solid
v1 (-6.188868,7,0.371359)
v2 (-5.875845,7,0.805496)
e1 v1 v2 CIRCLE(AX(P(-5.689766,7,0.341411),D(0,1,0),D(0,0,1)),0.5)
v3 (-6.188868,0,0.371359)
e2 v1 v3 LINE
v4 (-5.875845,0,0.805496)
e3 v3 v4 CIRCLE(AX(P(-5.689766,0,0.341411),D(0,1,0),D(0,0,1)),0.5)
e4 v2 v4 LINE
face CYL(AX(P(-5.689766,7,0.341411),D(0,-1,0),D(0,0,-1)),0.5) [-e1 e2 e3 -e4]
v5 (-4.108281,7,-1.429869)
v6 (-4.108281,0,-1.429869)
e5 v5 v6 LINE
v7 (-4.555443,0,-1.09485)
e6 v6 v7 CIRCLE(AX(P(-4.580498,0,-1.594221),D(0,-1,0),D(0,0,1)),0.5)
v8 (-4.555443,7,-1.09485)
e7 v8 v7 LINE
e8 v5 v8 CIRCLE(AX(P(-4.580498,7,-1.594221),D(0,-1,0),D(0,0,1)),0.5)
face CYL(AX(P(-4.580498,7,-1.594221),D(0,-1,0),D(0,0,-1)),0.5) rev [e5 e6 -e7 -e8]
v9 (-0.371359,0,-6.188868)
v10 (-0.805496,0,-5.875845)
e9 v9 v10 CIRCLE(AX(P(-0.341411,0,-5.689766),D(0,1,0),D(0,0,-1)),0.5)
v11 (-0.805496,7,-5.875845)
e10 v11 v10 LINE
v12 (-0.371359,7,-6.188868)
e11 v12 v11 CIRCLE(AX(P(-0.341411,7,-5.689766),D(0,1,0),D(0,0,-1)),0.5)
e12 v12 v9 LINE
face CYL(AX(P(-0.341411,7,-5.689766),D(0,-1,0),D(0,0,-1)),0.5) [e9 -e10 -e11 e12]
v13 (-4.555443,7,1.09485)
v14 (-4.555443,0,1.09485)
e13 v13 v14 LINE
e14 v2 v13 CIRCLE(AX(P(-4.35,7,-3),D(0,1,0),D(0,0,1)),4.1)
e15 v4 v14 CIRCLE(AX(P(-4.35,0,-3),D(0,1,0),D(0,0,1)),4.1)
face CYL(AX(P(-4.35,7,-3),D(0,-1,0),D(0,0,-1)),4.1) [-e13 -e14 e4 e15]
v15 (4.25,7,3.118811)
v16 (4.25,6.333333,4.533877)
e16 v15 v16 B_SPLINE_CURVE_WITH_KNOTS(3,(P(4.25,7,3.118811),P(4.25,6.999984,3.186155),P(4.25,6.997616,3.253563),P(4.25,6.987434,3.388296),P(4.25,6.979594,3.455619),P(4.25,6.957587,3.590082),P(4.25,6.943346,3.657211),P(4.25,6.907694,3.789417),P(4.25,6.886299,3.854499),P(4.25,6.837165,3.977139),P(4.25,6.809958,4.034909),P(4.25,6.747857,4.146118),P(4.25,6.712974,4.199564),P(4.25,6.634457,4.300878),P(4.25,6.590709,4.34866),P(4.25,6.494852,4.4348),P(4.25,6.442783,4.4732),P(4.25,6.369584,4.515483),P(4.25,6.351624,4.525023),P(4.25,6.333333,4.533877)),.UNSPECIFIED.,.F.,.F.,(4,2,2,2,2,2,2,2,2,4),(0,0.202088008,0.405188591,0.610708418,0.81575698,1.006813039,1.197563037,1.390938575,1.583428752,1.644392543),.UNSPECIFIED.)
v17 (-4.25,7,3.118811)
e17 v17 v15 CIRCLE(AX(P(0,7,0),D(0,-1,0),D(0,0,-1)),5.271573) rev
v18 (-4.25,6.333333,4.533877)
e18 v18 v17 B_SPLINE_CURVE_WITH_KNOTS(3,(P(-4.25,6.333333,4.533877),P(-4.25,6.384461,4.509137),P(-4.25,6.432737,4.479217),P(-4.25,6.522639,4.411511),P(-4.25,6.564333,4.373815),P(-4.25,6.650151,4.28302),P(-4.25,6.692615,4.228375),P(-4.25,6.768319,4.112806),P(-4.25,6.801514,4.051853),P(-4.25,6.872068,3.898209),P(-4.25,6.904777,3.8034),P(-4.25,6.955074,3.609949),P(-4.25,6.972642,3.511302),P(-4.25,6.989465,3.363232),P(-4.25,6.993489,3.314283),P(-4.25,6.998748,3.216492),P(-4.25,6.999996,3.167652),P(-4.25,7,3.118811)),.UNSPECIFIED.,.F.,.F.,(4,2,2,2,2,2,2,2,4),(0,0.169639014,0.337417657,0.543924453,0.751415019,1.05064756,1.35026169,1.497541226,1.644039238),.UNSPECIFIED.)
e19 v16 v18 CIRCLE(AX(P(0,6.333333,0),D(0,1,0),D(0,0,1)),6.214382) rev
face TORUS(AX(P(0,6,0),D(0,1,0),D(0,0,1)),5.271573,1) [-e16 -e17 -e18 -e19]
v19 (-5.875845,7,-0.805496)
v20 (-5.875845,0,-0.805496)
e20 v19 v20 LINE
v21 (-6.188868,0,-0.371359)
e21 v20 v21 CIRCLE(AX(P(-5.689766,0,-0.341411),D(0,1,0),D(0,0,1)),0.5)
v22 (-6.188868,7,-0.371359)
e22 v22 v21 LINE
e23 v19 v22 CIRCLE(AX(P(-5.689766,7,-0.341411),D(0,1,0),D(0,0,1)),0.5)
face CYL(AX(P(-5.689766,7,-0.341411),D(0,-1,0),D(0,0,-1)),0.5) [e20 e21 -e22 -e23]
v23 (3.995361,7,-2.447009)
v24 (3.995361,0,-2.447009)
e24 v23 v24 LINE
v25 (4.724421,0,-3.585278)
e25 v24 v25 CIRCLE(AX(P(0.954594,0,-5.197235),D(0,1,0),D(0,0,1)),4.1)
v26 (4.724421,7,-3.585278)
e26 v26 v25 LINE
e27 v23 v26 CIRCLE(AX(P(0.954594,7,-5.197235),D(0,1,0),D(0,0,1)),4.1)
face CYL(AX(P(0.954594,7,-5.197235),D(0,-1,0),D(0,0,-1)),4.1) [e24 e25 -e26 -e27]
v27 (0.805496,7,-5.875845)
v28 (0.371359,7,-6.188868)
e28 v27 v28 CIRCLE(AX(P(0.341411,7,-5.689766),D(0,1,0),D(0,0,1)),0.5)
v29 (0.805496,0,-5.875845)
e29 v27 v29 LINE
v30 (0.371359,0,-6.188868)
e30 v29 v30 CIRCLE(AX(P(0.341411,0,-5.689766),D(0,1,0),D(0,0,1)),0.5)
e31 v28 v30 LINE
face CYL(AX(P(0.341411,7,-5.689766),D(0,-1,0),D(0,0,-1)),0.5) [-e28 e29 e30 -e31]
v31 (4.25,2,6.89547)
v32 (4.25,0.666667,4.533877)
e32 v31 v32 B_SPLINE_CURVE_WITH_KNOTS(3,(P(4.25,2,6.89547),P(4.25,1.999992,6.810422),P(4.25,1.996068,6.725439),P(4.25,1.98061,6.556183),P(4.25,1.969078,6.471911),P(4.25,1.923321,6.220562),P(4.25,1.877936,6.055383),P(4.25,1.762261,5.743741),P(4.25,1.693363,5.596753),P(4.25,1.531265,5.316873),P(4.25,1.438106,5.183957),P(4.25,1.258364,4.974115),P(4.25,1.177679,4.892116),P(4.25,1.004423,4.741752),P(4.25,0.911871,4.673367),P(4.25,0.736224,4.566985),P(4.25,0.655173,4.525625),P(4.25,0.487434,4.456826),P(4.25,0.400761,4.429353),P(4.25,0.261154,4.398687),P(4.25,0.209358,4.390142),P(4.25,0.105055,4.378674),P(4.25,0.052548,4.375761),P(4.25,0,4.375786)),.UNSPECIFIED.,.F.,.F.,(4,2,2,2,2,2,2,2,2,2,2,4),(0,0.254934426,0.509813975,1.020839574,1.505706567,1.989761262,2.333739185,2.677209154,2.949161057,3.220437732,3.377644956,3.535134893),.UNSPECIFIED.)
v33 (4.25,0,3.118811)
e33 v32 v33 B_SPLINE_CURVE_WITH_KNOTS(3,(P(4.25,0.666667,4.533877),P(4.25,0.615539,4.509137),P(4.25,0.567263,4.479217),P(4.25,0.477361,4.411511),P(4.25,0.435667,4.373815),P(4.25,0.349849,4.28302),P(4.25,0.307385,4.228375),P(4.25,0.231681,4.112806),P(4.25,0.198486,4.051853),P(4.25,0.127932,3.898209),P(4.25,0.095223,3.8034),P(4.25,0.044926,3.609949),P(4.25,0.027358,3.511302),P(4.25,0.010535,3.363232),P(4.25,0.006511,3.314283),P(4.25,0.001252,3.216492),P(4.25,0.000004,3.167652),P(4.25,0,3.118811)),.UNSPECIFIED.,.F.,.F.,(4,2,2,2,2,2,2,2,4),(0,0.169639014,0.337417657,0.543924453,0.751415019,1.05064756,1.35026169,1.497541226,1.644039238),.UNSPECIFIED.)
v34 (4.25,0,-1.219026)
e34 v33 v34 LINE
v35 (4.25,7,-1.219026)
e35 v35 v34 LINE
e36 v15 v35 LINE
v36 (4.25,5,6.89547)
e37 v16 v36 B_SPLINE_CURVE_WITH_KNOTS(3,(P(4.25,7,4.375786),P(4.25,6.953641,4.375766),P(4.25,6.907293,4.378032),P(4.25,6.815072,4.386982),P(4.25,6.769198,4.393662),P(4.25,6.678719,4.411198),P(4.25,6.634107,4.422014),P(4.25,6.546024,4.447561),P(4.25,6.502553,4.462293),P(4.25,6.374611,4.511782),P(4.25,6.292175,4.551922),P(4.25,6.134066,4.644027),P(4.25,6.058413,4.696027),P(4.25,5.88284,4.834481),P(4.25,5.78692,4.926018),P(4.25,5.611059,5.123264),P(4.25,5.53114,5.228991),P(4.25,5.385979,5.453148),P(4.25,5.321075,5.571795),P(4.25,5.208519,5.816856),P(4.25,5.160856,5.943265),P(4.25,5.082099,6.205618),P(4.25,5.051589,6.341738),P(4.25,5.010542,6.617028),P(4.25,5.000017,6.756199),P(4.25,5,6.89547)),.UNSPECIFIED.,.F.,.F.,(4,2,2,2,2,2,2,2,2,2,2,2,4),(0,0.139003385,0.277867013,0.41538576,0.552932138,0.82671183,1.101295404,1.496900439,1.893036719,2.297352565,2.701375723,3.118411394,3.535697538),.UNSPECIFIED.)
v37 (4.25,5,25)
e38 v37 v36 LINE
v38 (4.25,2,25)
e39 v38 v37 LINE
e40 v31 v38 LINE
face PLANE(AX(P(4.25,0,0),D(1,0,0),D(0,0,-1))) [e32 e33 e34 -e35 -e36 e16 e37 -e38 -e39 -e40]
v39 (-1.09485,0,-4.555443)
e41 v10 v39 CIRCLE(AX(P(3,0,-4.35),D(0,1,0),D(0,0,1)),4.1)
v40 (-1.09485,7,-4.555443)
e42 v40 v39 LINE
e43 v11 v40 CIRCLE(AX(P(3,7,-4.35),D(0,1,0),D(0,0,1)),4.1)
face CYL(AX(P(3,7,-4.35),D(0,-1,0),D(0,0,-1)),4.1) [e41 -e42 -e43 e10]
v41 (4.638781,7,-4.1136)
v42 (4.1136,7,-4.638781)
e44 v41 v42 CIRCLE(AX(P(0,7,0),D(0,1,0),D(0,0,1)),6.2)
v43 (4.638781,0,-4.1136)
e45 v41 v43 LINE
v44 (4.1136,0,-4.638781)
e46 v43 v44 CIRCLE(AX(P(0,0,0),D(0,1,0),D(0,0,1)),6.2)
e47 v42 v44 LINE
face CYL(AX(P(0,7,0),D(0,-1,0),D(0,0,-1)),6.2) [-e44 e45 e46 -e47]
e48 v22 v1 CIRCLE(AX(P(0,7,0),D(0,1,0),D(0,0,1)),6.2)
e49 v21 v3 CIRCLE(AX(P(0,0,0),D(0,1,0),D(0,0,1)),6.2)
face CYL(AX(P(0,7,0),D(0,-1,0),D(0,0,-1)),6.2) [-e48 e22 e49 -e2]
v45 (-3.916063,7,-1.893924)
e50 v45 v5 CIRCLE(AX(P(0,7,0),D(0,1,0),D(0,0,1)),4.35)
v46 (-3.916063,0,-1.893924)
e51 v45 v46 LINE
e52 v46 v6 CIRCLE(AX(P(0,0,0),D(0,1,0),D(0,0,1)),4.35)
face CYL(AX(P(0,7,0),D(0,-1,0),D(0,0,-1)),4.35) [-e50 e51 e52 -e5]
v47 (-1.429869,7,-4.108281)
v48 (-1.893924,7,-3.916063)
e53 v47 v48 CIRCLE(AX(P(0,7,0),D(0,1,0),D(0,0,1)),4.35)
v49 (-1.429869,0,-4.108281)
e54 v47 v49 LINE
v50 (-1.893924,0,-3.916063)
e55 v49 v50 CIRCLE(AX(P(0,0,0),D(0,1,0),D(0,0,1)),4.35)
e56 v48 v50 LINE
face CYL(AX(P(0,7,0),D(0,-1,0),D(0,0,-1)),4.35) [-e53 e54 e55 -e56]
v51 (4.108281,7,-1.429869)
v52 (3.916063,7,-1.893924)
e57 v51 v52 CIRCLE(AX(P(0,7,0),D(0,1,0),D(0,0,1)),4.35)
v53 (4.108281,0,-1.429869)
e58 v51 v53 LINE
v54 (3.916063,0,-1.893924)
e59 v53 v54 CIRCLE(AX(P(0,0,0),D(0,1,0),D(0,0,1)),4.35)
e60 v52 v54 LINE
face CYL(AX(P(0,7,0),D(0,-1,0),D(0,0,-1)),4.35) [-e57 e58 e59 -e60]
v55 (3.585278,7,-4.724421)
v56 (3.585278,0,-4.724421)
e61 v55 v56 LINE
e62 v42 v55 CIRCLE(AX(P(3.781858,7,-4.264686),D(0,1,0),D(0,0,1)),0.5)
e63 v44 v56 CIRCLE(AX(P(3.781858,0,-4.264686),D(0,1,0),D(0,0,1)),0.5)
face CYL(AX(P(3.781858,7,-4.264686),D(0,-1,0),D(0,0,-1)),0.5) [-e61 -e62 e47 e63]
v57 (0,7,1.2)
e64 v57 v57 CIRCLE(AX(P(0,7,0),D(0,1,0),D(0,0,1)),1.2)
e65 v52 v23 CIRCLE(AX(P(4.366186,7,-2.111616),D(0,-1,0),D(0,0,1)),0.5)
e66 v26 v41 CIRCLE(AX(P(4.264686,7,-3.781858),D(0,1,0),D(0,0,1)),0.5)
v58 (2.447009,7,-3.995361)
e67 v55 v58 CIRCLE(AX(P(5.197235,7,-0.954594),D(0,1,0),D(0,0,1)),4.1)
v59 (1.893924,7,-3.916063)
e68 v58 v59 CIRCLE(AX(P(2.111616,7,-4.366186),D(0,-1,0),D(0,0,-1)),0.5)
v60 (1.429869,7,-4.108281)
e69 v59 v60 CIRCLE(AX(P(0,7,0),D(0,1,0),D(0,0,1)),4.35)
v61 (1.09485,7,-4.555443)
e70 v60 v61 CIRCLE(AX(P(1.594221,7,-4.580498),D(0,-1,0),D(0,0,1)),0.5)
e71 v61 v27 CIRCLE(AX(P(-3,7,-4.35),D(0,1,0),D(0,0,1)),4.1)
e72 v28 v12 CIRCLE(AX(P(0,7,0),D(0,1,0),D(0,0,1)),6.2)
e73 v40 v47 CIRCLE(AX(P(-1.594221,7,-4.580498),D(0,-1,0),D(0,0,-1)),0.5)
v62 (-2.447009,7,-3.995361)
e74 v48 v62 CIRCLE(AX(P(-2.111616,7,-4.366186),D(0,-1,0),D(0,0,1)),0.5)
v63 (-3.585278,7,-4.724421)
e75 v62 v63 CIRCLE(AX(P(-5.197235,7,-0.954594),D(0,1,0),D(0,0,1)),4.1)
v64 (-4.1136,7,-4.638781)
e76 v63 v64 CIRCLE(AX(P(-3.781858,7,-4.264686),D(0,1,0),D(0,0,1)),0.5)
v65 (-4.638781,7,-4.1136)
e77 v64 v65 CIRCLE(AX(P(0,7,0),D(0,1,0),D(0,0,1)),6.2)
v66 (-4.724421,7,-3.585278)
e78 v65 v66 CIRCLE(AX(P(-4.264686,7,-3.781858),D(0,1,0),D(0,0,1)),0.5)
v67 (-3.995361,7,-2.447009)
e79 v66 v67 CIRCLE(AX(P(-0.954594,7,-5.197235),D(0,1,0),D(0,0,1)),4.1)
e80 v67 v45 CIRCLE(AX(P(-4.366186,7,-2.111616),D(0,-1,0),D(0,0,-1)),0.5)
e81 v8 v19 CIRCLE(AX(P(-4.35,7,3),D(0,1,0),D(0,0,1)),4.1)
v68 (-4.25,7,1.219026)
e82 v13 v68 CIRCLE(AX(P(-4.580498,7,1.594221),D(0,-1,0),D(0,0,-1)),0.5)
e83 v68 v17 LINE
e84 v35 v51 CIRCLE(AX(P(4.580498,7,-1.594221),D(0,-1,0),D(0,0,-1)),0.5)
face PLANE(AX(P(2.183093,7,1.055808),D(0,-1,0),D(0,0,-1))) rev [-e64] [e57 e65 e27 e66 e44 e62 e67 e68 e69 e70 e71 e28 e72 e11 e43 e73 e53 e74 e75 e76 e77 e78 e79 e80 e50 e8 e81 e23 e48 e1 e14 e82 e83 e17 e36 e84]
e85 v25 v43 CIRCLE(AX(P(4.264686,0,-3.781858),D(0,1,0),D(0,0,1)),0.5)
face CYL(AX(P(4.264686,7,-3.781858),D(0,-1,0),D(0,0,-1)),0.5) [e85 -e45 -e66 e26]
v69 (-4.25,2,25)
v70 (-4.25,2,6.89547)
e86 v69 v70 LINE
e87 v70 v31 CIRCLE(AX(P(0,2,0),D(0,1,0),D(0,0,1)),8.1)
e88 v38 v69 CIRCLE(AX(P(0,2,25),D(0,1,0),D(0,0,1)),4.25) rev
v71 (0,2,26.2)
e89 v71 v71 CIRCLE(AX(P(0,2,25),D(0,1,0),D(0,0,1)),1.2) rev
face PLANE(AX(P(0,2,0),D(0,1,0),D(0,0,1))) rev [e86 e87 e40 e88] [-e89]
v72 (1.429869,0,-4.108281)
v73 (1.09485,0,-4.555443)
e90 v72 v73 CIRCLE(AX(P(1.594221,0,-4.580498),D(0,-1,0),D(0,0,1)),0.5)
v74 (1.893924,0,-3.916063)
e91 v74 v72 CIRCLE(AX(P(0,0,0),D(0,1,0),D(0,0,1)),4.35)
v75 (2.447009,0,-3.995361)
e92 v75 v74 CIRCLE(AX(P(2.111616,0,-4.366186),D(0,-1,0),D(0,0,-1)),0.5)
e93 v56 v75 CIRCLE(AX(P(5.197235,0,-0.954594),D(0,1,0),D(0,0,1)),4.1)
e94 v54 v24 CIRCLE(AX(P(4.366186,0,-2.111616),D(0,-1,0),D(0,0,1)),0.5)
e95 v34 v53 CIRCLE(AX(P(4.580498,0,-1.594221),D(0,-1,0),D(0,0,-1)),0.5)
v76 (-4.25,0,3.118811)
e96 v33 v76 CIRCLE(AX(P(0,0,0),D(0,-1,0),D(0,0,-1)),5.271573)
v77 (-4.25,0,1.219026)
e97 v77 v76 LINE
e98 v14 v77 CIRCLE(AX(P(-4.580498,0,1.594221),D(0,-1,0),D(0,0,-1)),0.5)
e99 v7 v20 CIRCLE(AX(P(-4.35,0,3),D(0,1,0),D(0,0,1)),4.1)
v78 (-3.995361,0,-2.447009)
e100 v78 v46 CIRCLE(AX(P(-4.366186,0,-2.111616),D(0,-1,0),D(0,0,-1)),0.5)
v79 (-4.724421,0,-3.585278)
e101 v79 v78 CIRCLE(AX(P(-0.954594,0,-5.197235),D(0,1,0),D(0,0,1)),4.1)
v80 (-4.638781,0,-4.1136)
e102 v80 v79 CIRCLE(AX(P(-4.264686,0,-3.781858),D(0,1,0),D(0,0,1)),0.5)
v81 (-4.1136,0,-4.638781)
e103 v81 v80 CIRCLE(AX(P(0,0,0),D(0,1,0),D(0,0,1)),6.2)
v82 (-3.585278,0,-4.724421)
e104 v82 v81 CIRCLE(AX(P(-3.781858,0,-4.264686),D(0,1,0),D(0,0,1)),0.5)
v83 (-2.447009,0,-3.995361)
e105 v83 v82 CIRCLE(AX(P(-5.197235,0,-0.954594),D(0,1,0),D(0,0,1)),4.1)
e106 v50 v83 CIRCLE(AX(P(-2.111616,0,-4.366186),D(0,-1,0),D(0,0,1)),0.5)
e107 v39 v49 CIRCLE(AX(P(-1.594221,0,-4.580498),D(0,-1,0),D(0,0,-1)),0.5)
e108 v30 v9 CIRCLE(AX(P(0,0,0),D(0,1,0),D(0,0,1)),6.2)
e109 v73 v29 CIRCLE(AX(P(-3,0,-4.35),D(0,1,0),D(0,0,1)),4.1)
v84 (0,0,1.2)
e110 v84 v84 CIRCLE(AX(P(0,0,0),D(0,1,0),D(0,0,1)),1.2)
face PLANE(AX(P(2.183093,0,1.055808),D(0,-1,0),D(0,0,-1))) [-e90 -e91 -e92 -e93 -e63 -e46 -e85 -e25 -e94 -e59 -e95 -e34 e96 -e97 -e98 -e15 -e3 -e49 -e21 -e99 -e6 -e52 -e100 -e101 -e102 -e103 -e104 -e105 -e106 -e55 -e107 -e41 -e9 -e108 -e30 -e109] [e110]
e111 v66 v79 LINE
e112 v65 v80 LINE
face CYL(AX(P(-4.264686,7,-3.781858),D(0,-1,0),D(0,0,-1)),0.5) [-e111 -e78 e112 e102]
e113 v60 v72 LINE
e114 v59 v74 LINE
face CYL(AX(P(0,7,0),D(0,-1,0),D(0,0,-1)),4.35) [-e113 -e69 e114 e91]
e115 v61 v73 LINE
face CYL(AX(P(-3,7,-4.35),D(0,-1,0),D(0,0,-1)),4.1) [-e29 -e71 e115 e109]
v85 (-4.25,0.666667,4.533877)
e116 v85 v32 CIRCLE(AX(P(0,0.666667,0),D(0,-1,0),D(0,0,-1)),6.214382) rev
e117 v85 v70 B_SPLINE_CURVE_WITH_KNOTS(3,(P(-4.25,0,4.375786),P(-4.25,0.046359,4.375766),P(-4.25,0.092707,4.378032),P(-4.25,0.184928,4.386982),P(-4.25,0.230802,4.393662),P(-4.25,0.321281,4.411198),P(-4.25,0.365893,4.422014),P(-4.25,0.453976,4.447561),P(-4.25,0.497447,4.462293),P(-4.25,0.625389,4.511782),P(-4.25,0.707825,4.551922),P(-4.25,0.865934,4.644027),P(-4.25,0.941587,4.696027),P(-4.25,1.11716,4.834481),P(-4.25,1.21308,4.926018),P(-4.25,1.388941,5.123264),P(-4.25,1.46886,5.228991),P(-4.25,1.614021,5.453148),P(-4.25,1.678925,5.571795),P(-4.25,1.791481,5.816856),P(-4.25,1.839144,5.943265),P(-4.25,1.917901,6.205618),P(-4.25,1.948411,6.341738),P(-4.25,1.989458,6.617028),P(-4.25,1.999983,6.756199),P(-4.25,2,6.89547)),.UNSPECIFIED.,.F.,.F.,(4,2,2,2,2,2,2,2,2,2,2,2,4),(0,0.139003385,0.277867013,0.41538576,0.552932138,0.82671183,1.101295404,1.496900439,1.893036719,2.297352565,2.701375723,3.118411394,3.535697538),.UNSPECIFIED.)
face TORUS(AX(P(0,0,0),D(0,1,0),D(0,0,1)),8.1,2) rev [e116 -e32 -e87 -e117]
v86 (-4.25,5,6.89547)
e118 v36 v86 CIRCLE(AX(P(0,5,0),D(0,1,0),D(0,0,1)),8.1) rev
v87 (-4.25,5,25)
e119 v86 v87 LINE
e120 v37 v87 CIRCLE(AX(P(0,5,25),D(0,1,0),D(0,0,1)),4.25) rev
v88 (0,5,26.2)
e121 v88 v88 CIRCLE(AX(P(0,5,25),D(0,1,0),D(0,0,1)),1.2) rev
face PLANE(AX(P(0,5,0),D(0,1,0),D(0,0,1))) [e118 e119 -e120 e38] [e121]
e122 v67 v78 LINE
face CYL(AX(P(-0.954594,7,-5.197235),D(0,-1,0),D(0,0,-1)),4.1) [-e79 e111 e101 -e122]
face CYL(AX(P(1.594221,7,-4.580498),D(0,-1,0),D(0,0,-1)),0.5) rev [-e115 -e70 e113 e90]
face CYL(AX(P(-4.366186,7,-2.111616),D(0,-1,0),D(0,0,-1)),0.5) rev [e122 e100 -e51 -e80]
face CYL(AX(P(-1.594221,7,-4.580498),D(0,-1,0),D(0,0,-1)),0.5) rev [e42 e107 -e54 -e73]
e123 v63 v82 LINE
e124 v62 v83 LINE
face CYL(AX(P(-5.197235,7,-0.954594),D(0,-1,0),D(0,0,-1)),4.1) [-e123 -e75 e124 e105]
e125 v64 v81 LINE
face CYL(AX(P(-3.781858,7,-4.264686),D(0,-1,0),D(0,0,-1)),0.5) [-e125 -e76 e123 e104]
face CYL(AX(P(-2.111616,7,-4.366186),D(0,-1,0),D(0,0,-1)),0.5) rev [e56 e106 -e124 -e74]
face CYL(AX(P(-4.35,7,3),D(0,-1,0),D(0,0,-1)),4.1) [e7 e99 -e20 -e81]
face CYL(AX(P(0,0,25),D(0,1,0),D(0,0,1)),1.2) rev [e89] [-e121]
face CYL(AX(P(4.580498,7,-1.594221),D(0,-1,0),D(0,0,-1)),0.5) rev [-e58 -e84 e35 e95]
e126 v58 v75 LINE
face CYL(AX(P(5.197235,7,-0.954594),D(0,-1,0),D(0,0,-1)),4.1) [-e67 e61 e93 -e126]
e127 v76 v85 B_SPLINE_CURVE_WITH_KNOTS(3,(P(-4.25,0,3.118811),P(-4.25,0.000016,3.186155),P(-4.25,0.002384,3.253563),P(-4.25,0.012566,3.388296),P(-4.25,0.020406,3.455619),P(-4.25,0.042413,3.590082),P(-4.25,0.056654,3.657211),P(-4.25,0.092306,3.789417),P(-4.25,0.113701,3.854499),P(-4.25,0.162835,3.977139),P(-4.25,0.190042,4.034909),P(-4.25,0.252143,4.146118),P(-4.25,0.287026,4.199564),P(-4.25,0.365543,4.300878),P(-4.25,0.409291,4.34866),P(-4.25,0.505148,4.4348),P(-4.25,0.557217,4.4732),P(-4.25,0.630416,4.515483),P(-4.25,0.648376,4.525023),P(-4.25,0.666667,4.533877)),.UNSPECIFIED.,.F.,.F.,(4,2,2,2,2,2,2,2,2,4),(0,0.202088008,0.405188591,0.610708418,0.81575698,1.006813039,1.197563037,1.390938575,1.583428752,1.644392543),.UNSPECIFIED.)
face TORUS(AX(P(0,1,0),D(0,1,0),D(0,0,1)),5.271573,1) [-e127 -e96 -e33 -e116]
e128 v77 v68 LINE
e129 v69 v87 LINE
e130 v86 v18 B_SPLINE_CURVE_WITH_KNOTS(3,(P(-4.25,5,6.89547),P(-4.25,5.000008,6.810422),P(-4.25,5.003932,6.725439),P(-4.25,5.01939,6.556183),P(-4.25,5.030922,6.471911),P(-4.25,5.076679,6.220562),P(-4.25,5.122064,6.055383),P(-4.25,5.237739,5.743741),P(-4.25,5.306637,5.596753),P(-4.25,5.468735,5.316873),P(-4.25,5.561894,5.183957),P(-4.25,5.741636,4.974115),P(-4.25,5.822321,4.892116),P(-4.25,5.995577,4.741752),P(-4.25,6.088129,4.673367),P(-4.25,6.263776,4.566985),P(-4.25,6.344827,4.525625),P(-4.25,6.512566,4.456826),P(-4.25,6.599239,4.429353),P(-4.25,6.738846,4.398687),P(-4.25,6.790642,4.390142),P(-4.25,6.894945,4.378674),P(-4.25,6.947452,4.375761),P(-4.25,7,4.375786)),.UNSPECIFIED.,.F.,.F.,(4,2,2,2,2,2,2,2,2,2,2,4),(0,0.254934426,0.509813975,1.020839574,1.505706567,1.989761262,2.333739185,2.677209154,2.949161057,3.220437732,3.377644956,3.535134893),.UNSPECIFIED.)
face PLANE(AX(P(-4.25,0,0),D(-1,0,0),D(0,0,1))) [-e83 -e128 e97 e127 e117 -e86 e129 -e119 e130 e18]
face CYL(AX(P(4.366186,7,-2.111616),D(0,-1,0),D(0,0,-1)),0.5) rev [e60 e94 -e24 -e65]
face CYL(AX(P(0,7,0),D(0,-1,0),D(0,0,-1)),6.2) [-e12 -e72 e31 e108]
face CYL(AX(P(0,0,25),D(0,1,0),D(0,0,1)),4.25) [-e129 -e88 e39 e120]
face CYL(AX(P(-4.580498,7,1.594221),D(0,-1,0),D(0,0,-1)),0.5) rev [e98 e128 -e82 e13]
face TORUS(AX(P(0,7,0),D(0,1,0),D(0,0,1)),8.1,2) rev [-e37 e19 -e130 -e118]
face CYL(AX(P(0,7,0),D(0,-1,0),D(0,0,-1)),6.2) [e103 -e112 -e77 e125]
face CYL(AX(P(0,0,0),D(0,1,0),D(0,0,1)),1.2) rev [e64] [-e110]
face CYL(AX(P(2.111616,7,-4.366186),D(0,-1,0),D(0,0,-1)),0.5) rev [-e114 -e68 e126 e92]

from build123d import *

# Parameters (mm, degrees)
BOSS_EXTRUDE1_DEPTH = 7
BOSS_EXTRUDE2_DEPTH = 7
SKETCH3_R           = 1.2
SKETCH3_W           = 3
SKETCH3_H           = 6
SKETCH3_W_2         = 1
SKETCH3_H_2         = 1.756233336
CUT_EXTRUDE1_DEPTH  = 7
CUT_EXTRUDE2_DEPTH  = 2
CUT_EXTRUDE3_START  = -2
CUT_EXTRUDE3_DEPTH  = 2
FILLET1_R           = 2
FILLET2_R           = 1


with BuildPart() as part:
    # Sketch1 → Boss-Extrude1 (new body)
    with BuildSketch(Plane(origin=(0, 0, 0), x_dir=(1, 0, 0), z_dir=(0, 1, 0))):
        with BuildLine():
            ThreePointArc((-3.91606346, 1.893923699), (-4.018875966, 1.664672931), (-4.108281319, 1.429868737))
            ThreePointArc((-4.108281319, 1.429868737), (-4.280699455, 1.194070126), (-4.55544348, 1.094849567))
            ThreePointArc((-4.55544348, 1.094849567), (-5.227650928, 1.004963027), (-5.875844758, 0.805495733))
            ThreePointArc((-5.875844758, 0.805495733), (-6.095335918, 0.633837197), (-6.188868421, 0.371359211))
            ThreePointArc((-6.188868421, 0.371359211), (-6.2, 0), (-6.188868421, -0.371359211))
            ThreePointArc((-6.188868421, -0.371359211), (-6.095335918, -0.633837197), (-5.875844758, -0.805495733))
            ThreePointArc((-5.875844758, -0.805495733), (-5.227650928, -1.004963027), (-4.55544348, -1.094849567))
            ThreePointArc((-4.55544348, -1.094849567), (-4.280699455, -1.194070126), (-4.108281319, -1.429868737))
            ThreePointArc((-4.108281319, -1.429868737), (-4.018875966, -1.664672931), (-3.91606346, -1.893923699))
            ThreePointArc((-3.91606346, -1.893923699), (-3.871246696, -2.182576529), (-3.995360529, -2.447009422))
            ThreePointArc((-3.995360529, -2.447009422), (-4.407123592, -2.985891249), (-4.724421169, -3.585278179))
            ThreePointArc((-4.724421169, -3.585278179), (-4.758243941, -3.861862781), (-4.638781445, -4.113600212))
            ThreePointArc((-4.638781445, -4.113600212), (-4.274116248, -4.491317212), (-3.87880163, -4.836827257))
            ThreePointArc((-3.87880163, -4.836827257), (-3.119853719, -4.489348414), (-2.447009422, -3.995360529))
            ThreePointArc((-2.447009422, -3.995360529), (-2.182576529, -3.871246696), (-1.893923699, -3.91606346))
            ThreePointArc((-1.893923699, -3.91606346), (-1.664672931, -4.018875966), (-1.429868737, -4.108281319))
            ThreePointArc((-1.429868737, -4.108281319), (-1.194070126, -4.280699455), (-1.094849567, -4.55544348))
            ThreePointArc((-1.094849567, -4.55544348), (-1.004963027, -5.227650928), (-0.805495733, -5.875844758))
            ThreePointArc((-0.805495733, -5.875844758), (-0.633837197, -6.095335918), (-0.371359211, -6.188868421))
            ThreePointArc((-0.371359211, -6.188868421), (0, -6.2), (0.371359211, -6.188868421))
            ThreePointArc((0.371359211, -6.188868421), (0.633837197, -6.095335918), (0.805495733, -5.875844758))
            ThreePointArc((0.805495733, -5.875844758), (1.004963027, -5.227650928), (1.094849567, -4.55544348))
            ThreePointArc((1.094849567, -4.55544348), (1.194070126, -4.280699455), (1.429868737, -4.108281319))
            ThreePointArc((1.429868737, -4.108281319), (1.664672931, -4.018875966), (1.893923699, -3.91606346))
            ThreePointArc((1.893923699, -3.91606346), (2.182576529, -3.871246696), (2.447009422, -3.995360529))
            ThreePointArc((2.447009422, -3.995360529), (2.985891249, -4.407123592), (3.585278179, -4.724421169))
            ThreePointArc((3.585278179, -4.724421169), (3.861862781, -4.758243941), (4.113600212, -4.638781445))
            ThreePointArc((4.113600212, -4.638781445), (4.384062043, -4.384062043), (4.638781445, -4.113600212))
            ThreePointArc((4.638781445, -4.113600212), (4.758243941, -3.861862781), (4.724421169, -3.585278179))
            ThreePointArc((4.724421169, -3.585278179), (4.407123592, -2.985891249), (3.995360529, -2.447009422))
            ThreePointArc((3.995360529, -2.447009422), (3.871246696, -2.182576529), (3.91606346, -1.893923699))
            ThreePointArc((3.91606346, -1.893923699), (4.018875966, -1.664672931), (4.108281319, -1.429868737))
            ThreePointArc((4.108281319, -1.429868737), (4.280699455, -1.194070126), (4.55544348, -1.094849567))
            ThreePointArc((4.55544348, -1.094849567), (5.227650928, -1.004963027), (5.875844758, -0.805495733))
            ThreePointArc((5.875844758, -0.805495733), (6.095335918, -0.633837197), (6.188868421, -0.371359211))
            ThreePointArc((6.188868421, -0.371359211), (6.2, 0), (6.188868421, 0.371359211))
            ThreePointArc((6.188868421, 0.371359211), (6.095335918, 0.633837197), (5.875844758, 0.805495733))
            ThreePointArc((5.875844758, 0.805495733), (5.227650928, 1.004963027), (4.55544348, 1.094849567))
            ThreePointArc((4.55544348, 1.094849567), (4.280699455, 1.194070126), (4.108281319, 1.429868737))
            ThreePointArc((4.108281319, 1.429868737), (4.018875966, 1.664672931), (3.91606346, 1.893923699))
            ThreePointArc((3.91606346, 1.893923699), (3.871246696, 2.182576529), (3.995360529, 2.447009422))
            ThreePointArc((3.995360529, 2.447009422), (4.407123592, 2.985891249), (4.724421169, 3.585278179))
            ThreePointArc((4.724421169, 3.585278179), (4.758243941, 3.861862781), (4.638781445, 4.113600212))
            ThreePointArc((4.638781445, 4.113600212), (4.384062043, 4.384062043), (4.113600212, 4.638781445))
            ThreePointArc((4.113600212, 4.638781445), (3.861862781, 4.758243941), (3.585278179, 4.724421169))
            ThreePointArc((3.585278179, 4.724421169), (2.985891249, 4.407123592), (2.447009422, 3.995360529))
            ThreePointArc((2.447009422, 3.995360529), (2.182576529, 3.871246696), (1.893923699, 3.91606346))
            ThreePointArc((1.893923699, 3.91606346), (1.664672931, 4.018875966), (1.429868737, 4.108281319))
            ThreePointArc((1.429868737, 4.108281319), (1.194070126, 4.280699455), (1.094849567, 4.55544348))
            ThreePointArc((1.094849567, 4.55544348), (1.004963027, 5.227650928), (0.805495733, 5.875844758))
            ThreePointArc((0.805495733, 5.875844758), (0.633837197, 6.095335918), (0.371359211, 6.188868421))
            ThreePointArc((0.371359211, 6.188868421), (0, 6.2), (-0.371359211, 6.188868421))
            ThreePointArc((-0.371359211, 6.188868421), (-0.633837197, 6.095335918), (-0.805495733, 5.875844758))
            ThreePointArc((-0.805495733, 5.875844758), (-1.004963027, 5.227650928), (-1.094849567, 4.55544348))
            ThreePointArc((-1.094849567, 4.55544348), (-1.194070126, 4.280699455), (-1.429868737, 4.108281319))
            ThreePointArc((-1.429868737, 4.108281319), (-1.664672931, 4.018875966), (-1.893923699, 3.91606346))
            ThreePointArc((-1.893923699, 3.91606346), (-2.182576529, 3.871246696), (-2.447009422, 3.995360529))
            ThreePointArc((-2.447009422, 3.995360529), (-2.985891249, 4.407123592), (-3.585278179, 4.724421169))
            ThreePointArc((-3.585278179, 4.724421169), (-3.861862781, 4.758243941), (-4.113600212, 4.638781445))
            ThreePointArc((-4.113600212, 4.638781445), (-4.384062043, 4.384062043), (-4.638781445, 4.113600212))
            ThreePointArc((-4.638781445, 4.113600212), (-4.758243941, 3.861862781), (-4.724421169, 3.585278179))
            ThreePointArc((-4.724421169, 3.585278179), (-4.407123592, 2.985891249), (-3.995360529, 2.447009422))
            ThreePointArc((-3.995360529, 2.447009422), (-3.871246696, 2.182576529), (-3.91606346, 1.893923699))
        make_face()
    extrude(amount=BOSS_EXTRUDE1_DEPTH)

    # Sketch2 → Boss-Extrude2 (add)
    with BuildSketch(Plane(origin=(0, 7, 0), x_dir=(1, 0, 0), z_dir=(0, 1, 0))):
        with BuildLine():
            Line((4.25, 0), (4.25, -25))
            ThreePointArc((4.25, -25), (0, -29.25), (-4.25, -25))
            Line((-4.25, -25), (-4.25, 0))
            ThreePointArc((-4.25, 0), (0, 4.25), (4.25, 0))
        make_face()
    extrude(amount=-BOSS_EXTRUDE2_DEPTH)

    # Sketch3 → Cut-Extrude1 (cut)
    with BuildSketch(Plane(origin=(0, 7, 0), x_dir=(1, 0, 0), z_dir=(0, 1, 0))):
        with Locations(Location((0, 0, 0), (0, 0, 270))):
            Circle(SKETCH3_R)
        with Locations(Location((0, -25, 0), (0, 0, 270))):
            Circle(SKETCH3_R)
        with Locations((5.75, -1.514144437)):
            Rectangle(SKETCH3_W, SKETCH3_H)
        with Locations((-4.75, -3.636027769)):
            Rectangle(SKETCH3_W_2, SKETCH3_H_2)
    extrude(amount=-CUT_EXTRUDE1_DEPTH, mode=Mode.SUBTRACT)

    # Sketch5 → Cut-Extrude2 (cut)
    with BuildSketch(Plane.XZ):
        with BuildLine():
            Line((-4.25, 4.375785644), (-4.25, 29.25))
            Line((-4.25, 29.25), (4.25, 29.25))
            Line((4.25, 29.25), (4.25, 4.375785644))
            ThreePointArc((4.25, 4.375785644), (0, 6.1), (-4.25, 4.375785644))
        make_face()
    extrude(amount=-CUT_EXTRUDE2_DEPTH, mode=Mode.SUBTRACT)

    # Sketch6 → Cut-Extrude3 (cut)
    with BuildSketch(Plane(origin=(0, 7, 0), x_dir=(1, 0, 0), z_dir=(0, 1, 0)).offset(CUT_EXTRUDE3_START)):
        with BuildLine():
            Line((-4.25, -4.375785644), (-4.25, -29.25))
            Line((-4.25, -29.25), (4.25, -29.25))
            Line((4.25, -29.25), (4.25, -4.375785644))
            ThreePointArc((4.25, -4.375785644), (0, -6.1), (-4.25, -4.375785644))
        make_face()
    extrude(amount=CUT_EXTRUDE3_DEPTH, mode=Mode.SUBTRACT)

    # Fillet1
    fillet1_edges = [part.edges().sort_by_distance(p)[0] for p in [
        (0, 2, 6.1),
        (0, 5, 6.1),
    ]]
    fillet(fillet1_edges, radius=FILLET1_R - 0.0001)  # a hair under: the kernel refuses the full size

    # Fillet2
    fillet2_edges = [part.edges().sort_by_distance(p)[0] for p in [
        (0, 7, 6.1),
        (0, 0, 6.1),
    ]]
    fillet(fillet2_edges, radius=FILLET2_R)


solid = part.part
